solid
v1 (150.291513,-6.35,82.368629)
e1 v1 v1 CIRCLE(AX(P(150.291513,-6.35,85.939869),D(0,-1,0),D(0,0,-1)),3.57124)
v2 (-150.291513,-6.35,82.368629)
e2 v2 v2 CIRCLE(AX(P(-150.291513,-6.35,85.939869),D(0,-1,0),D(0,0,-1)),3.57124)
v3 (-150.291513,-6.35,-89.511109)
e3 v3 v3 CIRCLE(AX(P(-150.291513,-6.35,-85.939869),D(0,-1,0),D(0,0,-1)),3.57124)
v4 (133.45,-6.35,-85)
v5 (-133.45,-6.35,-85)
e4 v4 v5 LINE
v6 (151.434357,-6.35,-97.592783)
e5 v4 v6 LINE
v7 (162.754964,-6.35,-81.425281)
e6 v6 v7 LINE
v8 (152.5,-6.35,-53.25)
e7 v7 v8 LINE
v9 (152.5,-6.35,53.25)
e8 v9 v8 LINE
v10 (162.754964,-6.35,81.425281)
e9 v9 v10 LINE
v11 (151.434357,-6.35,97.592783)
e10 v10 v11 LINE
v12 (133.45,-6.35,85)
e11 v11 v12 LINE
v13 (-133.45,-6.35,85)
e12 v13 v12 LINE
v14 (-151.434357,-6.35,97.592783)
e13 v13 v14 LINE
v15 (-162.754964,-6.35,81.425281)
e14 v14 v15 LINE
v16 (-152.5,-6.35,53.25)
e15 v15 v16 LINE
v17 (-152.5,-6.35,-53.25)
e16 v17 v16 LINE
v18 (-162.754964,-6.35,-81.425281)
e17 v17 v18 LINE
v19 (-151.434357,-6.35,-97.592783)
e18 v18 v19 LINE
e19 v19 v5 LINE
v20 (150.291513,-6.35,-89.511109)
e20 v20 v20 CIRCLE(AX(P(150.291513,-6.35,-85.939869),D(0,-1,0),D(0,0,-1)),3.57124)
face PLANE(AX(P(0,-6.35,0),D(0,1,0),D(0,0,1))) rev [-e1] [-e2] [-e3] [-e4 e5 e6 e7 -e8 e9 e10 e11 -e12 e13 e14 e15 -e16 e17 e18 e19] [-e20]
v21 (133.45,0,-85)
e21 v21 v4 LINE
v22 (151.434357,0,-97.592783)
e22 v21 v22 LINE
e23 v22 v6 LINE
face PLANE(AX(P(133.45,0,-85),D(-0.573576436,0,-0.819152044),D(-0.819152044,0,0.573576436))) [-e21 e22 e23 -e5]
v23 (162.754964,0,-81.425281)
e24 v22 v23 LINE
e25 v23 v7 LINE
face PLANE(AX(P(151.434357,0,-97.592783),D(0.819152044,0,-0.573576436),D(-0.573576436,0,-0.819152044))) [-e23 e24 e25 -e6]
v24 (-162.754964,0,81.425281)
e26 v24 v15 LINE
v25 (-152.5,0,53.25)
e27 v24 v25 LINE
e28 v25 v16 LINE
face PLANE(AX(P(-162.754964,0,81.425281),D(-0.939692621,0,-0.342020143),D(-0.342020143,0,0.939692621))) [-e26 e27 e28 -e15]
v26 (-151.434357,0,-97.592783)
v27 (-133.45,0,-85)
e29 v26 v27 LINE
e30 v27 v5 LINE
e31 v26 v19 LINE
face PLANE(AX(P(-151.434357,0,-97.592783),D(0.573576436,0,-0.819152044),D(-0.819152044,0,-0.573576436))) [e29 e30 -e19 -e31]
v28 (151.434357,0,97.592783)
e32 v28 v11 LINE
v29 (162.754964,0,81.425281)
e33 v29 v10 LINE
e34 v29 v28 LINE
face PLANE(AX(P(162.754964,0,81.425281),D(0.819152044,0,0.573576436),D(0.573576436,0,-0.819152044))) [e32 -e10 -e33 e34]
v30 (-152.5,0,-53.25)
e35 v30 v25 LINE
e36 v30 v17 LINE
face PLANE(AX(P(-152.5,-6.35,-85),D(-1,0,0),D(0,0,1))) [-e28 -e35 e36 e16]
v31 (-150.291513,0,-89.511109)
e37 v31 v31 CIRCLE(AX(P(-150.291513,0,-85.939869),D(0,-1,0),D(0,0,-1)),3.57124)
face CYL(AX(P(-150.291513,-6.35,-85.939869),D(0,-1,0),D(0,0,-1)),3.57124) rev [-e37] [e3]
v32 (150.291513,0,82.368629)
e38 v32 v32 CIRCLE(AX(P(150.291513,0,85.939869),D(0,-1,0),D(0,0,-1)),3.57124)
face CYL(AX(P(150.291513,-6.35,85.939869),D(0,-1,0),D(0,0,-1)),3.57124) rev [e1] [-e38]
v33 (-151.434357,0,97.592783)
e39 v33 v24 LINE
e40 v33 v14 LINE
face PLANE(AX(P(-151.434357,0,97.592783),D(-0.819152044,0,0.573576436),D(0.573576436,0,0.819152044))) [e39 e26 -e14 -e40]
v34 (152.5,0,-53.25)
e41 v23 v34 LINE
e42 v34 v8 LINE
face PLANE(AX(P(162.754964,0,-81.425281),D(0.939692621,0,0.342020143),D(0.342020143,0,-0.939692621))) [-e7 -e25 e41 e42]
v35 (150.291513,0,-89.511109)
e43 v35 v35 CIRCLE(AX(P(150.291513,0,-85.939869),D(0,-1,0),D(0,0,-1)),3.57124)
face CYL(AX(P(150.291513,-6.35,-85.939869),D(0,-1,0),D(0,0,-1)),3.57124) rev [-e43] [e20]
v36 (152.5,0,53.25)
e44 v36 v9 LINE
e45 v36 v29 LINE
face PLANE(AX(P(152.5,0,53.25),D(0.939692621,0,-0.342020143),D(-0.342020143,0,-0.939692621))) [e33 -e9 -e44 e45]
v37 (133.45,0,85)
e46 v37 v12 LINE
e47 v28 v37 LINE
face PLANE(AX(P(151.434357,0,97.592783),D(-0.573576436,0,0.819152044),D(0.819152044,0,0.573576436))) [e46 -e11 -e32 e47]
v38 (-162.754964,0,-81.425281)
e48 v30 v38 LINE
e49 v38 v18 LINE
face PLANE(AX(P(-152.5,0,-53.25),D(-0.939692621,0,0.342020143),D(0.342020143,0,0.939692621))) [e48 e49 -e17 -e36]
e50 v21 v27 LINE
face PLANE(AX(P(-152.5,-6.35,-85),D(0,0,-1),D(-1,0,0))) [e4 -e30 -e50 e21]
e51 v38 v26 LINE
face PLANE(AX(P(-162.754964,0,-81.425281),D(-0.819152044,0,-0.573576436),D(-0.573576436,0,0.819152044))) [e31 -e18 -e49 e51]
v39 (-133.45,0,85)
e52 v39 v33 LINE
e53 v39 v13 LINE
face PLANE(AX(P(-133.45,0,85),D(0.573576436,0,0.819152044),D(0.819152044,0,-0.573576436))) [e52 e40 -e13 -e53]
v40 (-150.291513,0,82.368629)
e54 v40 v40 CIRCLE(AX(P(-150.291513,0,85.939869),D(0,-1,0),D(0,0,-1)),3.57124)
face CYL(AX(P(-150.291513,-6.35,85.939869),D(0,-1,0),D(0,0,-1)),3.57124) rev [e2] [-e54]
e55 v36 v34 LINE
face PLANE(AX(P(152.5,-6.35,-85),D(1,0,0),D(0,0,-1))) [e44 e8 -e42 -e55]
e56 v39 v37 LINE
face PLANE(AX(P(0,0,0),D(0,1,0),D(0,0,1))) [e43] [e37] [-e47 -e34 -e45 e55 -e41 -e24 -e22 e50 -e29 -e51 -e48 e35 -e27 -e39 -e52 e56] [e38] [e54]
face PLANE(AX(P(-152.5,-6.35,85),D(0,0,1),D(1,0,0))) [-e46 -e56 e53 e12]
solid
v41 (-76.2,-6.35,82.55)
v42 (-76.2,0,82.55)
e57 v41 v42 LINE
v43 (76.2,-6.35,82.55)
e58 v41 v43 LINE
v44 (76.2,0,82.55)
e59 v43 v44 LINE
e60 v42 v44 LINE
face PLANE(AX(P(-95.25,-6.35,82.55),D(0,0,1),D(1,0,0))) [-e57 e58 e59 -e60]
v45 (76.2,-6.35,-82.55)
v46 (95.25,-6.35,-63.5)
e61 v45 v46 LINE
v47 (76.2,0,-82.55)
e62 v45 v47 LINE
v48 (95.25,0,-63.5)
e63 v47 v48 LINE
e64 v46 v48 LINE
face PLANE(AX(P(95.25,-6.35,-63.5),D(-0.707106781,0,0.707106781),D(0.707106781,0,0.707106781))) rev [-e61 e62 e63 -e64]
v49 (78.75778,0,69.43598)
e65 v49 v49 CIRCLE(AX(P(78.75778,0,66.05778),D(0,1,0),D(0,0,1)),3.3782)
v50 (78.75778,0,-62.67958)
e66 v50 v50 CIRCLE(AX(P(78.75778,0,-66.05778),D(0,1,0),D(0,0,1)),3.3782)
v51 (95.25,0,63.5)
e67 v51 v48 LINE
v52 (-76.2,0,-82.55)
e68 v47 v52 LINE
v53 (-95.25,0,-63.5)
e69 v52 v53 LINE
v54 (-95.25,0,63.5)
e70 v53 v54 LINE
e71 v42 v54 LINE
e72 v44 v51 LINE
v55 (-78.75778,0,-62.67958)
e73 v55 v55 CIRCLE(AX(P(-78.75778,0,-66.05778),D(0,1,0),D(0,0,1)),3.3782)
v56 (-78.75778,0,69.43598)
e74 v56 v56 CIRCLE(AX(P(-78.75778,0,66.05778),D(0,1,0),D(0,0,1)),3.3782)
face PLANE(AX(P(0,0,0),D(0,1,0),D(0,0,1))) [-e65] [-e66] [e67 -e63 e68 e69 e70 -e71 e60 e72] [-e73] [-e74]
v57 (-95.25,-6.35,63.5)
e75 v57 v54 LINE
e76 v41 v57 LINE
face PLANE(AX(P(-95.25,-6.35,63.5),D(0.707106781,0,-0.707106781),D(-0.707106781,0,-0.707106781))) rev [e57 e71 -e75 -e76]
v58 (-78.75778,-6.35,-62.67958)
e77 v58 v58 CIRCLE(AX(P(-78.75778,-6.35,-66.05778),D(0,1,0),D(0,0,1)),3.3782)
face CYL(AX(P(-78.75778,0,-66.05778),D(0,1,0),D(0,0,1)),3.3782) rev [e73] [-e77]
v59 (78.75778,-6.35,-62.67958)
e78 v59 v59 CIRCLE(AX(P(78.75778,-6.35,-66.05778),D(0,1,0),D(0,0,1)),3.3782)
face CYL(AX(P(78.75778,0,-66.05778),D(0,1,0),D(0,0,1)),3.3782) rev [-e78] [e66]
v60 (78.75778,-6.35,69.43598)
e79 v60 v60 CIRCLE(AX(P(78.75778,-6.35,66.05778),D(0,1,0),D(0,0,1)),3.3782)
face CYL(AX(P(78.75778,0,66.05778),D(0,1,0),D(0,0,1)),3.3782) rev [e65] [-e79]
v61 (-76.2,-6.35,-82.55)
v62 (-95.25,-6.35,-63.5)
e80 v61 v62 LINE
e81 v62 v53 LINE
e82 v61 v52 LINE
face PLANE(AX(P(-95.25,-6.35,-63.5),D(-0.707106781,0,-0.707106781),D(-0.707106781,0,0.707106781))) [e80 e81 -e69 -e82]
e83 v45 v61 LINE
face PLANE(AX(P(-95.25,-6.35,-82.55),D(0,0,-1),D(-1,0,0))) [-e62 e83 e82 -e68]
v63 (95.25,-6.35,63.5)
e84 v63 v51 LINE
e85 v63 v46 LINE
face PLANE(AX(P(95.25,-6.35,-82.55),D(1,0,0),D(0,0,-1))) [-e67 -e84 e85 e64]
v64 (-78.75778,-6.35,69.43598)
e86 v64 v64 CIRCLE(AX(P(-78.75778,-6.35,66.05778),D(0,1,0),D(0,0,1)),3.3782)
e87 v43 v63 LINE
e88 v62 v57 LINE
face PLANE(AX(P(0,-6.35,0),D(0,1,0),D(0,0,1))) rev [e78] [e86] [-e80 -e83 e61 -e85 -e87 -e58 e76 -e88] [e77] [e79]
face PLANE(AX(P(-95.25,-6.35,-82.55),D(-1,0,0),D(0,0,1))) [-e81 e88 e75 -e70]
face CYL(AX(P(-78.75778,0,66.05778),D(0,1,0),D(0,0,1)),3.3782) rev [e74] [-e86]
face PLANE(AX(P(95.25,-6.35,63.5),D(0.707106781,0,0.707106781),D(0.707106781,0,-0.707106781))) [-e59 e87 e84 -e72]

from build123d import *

# Parameters (mm, degrees)
MARKUP1_START                    = -6.35
MARKUP1_OUTLINE_R                = 3.3782
MARKUP1_DEPTH                    = 6.35
SKETCH2_W                        = 305.000000108
SKETCH2_H                        = 170.000000106
BOSS_EXTRUDE1_DEPTH              = 6.35
BOSS_EXTRUDE2_DEPTH              = 6.35
SKETCH5_W                        = 3.57124
SKETCH5_H                        = 6.35
F_1_4_CLEARANCE_HOLE1_AT_2_COUNT = 2
F_1_4_CLEARANCE_HOLE1_AT_2_PITCH = 300.583026684
F_1_4_CLEARANCE_HOLE1_AT_3_COUNT = 2
F_1_4_CLEARANCE_HOLE1_AT_3_PITCH = 346.255396975
F_1_4_CLEARANCE_HOLE1_AT_4_COUNT = 2
F_1_4_CLEARANCE_HOLE1_AT_4_PITCH = 171.879737036


# Read off the part's stored shape, not the designer's step: Markup1
with BuildPart() as part:
    # Markup1 outline → Markup1 (new body)
    with BuildSketch(Plane(origin=(0, 0, 0), x_dir=(1, 0, 0), z_dir=(0, 1, 0)).offset(MARKUP1_START)):
        Polygon((76.2, -82.55), (95.25, -63.5), (95.25, 63.5), (76.2, 82.55), (-76.2, 82.55), (-95.25, 63.5), (-95.25, -63.5), (-76.2, -82.55), align=None)
        with Locations((-78.75778, -66.05778)):
            Circle(MARKUP1_OUTLINE_R, mode=Mode.SUBTRACT)
        with Locations((78.75778, -66.05778)):
            Circle(MARKUP1_OUTLINE_R, mode=Mode.SUBTRACT)
        with Locations((-78.75778, 66.05778)):
            Circle(MARKUP1_OUTLINE_R, mode=Mode.SUBTRACT)
        with Locations((78.75778, 66.05778)):
            Circle(MARKUP1_OUTLINE_R, mode=Mode.SUBTRACT)
    extrude(amount=MARKUP1_DEPTH)


with BuildPart() as body_2:
    # Sketch2 → Boss-Extrude1 (new body)
    with BuildSketch(Plane(origin=(0, 0, 0), x_dir=(1, 0, 0), z_dir=(0, 1, 0))):
        Rectangle(SKETCH2_W, SKETCH2_H)
    extrude(amount=-BOSS_EXTRUDE1_DEPTH)

    # Sketch3 → Boss-Extrude2 (add)
    with BuildSketch(Plane.XZ.offset(6.35)):
        Polygon((133.450000054, 85.000000053), (133.450000054, 53.250000053), (152.500000054, 53.250000053), (162.75496375, 81.425281244), (151.4343574, 97.592782637), align=None)
        Polygon((152.500000054, -53.250000053), (133.450000054, -53.250000053), (133.450000054, -85.000000053), (151.4343574, -97.592782637), (162.75496375, -81.425281244), align=None)
        Polygon((-133.450000054, -85.000000053), (-133.450000054, -53.250000053), (-152.500000054, -53.250000053), (-162.75496375, -81.425281244), (-151.4343574, -97.592782637), align=None)
        Polygon((-152.500000054, 53.250000053), (-133.450000054, 53.250000053), (-133.450000054, 85.000000053), (-151.4343574, 97.592782637), (-162.75496375, 81.425281244), align=None)
    extrude(amount=-BOSS_EXTRUDE2_DEPTH)

    # Sketch5 → 1/4 Clearance Hole1 (revolve, cut)
    with BuildSketch(Plane(origin=(150.291513342, -6.35, -85.939868518), x_dir=(0, 0, -1), z_dir=(1, 0, 0))):
        with Locations((1.78562, 3.175)):
            Rectangle(SKETCH5_W, SKETCH5_H)
    f_1_4_clearance_hole1 = revolve(axis=Axis((150.291513342, -12.7, -85.939868518), (0, 1, 0)), mode=Mode.SUBTRACT)

    # 1/4 Clearance Hole1 at 2: 1/4 Clearance Hole1 ×2
    with Locations(*[(-i * F_1_4_CLEARANCE_HOLE1_AT_2_PITCH, 0, 0) for i in range(1, F_1_4_CLEARANCE_HOLE1_AT_2_COUNT)]):
        add(f_1_4_clearance_hole1, mode=Mode.SUBTRACT)

    # 1/4 Clearance Hole1 at 3: 1/4 Clearance Hole1 ×2
    with Locations(*[Vector(-0.8680962934015001, 0, 0.49639583537996856) * (i * F_1_4_CLEARANCE_HOLE1_AT_3_PITCH) for i in range(1, F_1_4_CLEARANCE_HOLE1_AT_3_COUNT)]):
        add(f_1_4_clearance_hole1, mode=Mode.SUBTRACT)

    # 1/4 Clearance Hole1 at 4: 1/4 Clearance Hole1 ×2
    with Locations(*[(0, 0, i * F_1_4_CLEARANCE_HOLE1_AT_4_PITCH) for i in range(1, F_1_4_CLEARANCE_HOLE1_AT_4_COUNT)]):
        add(f_1_4_clearance_hole1, mode=Mode.SUBTRACT)


solid = Compound([part.part, body_2.part])
